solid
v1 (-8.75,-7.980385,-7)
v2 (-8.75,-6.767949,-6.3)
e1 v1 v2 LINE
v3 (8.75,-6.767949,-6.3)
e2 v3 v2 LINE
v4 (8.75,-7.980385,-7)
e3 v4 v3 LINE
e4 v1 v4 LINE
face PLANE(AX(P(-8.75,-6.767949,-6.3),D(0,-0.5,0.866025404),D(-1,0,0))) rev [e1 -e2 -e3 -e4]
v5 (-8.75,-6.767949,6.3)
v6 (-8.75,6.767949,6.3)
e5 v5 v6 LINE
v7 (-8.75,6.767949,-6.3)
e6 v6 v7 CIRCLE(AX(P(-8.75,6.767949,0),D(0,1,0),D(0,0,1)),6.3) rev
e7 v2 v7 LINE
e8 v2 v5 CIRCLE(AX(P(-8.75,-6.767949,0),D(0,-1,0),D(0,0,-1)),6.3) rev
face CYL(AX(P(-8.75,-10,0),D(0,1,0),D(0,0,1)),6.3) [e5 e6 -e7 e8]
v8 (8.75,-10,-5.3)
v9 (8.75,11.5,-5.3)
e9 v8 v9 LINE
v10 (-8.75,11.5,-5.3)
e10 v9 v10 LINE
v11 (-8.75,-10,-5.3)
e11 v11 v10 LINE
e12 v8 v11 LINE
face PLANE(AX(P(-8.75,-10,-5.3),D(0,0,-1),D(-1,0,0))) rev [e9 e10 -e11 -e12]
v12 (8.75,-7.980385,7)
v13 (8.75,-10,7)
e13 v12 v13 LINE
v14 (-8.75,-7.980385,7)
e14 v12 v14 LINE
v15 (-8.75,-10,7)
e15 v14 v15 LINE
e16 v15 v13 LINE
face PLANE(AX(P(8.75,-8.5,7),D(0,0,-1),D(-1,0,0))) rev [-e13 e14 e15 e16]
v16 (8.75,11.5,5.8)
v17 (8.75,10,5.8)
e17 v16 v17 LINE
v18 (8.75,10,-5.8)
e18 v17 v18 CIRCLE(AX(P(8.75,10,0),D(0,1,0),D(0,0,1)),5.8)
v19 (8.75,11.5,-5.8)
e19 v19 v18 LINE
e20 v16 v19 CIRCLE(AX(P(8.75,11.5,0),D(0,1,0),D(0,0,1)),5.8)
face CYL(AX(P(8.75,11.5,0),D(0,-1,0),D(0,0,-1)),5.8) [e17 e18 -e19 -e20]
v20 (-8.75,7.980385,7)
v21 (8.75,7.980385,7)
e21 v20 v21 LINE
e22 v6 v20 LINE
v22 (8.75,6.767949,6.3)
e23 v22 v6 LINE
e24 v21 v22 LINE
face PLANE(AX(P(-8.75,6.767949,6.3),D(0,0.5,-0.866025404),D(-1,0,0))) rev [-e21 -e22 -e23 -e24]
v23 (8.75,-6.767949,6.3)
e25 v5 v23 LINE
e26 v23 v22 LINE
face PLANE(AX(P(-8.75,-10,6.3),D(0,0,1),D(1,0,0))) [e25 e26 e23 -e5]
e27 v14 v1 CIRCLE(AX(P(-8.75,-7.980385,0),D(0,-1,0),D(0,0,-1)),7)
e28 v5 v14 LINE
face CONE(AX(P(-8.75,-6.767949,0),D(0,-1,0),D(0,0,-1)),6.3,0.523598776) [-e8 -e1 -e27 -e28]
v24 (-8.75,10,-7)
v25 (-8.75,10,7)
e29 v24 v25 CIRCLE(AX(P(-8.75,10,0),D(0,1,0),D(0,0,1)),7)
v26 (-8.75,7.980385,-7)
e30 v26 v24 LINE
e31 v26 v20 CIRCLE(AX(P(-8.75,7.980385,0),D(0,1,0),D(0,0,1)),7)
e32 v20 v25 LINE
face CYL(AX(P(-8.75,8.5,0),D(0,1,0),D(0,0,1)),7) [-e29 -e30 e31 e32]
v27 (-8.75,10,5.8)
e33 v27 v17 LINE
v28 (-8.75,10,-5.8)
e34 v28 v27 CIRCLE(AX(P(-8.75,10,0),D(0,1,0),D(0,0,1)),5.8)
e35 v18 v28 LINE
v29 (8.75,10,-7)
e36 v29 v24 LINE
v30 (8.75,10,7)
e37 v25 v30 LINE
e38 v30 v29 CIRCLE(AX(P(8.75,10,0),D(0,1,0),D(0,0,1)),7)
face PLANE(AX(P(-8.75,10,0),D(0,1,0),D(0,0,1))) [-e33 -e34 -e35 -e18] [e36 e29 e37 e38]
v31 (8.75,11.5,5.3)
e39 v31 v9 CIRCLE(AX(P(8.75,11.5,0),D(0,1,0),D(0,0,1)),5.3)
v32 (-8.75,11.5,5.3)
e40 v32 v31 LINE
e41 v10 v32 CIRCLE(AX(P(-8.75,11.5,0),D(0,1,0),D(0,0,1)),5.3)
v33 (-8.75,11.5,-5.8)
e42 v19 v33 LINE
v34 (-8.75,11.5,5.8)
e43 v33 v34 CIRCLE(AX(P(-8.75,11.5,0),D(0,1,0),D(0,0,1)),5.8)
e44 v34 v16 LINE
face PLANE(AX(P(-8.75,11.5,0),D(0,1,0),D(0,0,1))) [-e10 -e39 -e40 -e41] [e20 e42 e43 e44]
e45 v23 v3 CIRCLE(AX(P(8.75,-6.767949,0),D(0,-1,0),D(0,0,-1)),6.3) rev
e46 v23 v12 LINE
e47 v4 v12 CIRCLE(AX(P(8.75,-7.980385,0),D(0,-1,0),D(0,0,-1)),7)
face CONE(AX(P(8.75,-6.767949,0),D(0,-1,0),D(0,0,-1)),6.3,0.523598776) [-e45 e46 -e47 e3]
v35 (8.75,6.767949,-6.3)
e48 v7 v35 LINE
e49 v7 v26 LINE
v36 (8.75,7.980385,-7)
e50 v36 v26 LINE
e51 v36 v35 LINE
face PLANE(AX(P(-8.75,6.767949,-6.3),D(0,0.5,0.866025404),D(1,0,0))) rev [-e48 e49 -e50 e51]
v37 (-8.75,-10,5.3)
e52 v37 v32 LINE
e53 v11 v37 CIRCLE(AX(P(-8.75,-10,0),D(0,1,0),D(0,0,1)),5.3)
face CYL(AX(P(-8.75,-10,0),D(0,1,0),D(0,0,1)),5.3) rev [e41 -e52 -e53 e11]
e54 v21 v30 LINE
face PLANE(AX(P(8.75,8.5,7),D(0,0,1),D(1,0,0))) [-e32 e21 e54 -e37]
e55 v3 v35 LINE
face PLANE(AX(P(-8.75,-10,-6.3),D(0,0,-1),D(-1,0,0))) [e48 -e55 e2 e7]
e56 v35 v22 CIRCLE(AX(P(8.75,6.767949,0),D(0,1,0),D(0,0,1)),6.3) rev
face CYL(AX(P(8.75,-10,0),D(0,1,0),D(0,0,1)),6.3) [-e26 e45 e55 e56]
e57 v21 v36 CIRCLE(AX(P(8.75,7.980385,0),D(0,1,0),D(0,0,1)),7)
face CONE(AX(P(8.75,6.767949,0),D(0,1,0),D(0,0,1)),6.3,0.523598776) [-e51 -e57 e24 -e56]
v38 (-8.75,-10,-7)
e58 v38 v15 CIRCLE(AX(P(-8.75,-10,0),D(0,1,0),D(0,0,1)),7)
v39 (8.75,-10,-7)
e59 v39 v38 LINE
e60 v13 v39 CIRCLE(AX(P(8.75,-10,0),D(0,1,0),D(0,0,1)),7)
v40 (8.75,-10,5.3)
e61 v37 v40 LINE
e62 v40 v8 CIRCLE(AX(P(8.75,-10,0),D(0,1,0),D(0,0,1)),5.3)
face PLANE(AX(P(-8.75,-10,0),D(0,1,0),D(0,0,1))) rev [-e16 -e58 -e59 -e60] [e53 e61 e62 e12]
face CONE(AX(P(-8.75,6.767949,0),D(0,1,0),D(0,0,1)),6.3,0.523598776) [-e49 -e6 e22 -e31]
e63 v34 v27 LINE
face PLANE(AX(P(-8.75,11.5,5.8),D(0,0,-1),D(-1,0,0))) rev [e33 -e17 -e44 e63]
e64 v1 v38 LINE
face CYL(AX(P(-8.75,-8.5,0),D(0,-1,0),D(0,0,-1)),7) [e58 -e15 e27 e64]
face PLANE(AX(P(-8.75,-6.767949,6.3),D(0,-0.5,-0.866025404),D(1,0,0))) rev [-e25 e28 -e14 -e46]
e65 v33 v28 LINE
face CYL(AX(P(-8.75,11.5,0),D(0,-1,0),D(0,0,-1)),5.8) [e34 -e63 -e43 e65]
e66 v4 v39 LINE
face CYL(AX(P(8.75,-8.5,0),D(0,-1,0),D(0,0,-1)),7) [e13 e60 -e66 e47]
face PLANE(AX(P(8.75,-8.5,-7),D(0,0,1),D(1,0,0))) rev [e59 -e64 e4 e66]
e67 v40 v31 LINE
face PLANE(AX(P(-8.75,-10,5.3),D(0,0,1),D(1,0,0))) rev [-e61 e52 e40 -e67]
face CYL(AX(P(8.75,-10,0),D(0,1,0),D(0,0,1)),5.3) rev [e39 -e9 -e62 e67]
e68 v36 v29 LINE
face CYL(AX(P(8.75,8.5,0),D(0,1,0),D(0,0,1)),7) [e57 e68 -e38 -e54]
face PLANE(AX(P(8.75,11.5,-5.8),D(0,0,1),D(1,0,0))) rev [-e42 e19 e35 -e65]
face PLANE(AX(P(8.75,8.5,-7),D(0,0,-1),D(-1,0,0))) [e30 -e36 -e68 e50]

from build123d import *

# Parameters (mm, degrees)
BOSS_EXTRUDE1_DEPTH      = 10
BOSS_EXTRUDE1_DEPTH_BACK = 10
BOSS_EXTRUDE2_START      = -1.5
BOSS_EXTRUDE2_DEPTH      = 1.5
BOSS_EXTRUDE3_DEPTH      = 1.5
CHAMFER1_SIZE            = 1
CHAMFER1_SIZE_2          = 1.732050808


with BuildPart() as part:
    # Sketch1 → Boss-Extrude1 (new, two sides: drawn at the far end of the back side and taken through both)
    with BuildSketch(Plane(origin=(0, 0, 0), x_dir=(1, 0, 0), z_dir=(0, 1, 0)).offset(-BOSS_EXTRUDE1_DEPTH_BACK)):
        with BuildLine():
            Line((-8.75, 6.3), (8.75, 6.3))
            ThreePointArc((8.75, 6.3), (15.05, 0), (8.75, -6.3))
            Line((8.75, -6.3), (-8.75, -6.3))
            ThreePointArc((-8.75, -6.3), (-15.05, 0), (-8.75, 6.3))
        make_face()
        with BuildLine():
            Line((-8.75, 5.3), (8.75, 5.3))
            ThreePointArc((8.75, 5.3), (14.05, 0), (8.75, -5.3))
            Line((8.75, -5.3), (-8.75, -5.3))
            ThreePointArc((-8.75, -5.3), (-14.05, 0), (-8.75, 5.3))
        make_face(mode=Mode.SUBTRACT)
    extrude(amount=BOSS_EXTRUDE1_DEPTH + BOSS_EXTRUDE1_DEPTH_BACK)

    # Sketch2 → Boss-Extrude2 (add)
    with BuildSketch(Plane(origin=(0, 10, 0), x_dir=(1, 0, 0), z_dir=(0, 1, 0)).offset(BOSS_EXTRUDE2_START)):
        with BuildLine():
            Line((8.75, -7), (-8.75, -7))
            ThreePointArc((-8.75, -7), (-15.75, 0), (-8.75, 7))
            Line((-8.75, 7), (8.75, 7))
            ThreePointArc((8.75, 7), (15.75, 0), (8.75, -7))
        make_face()
        with BuildLine():
            Line((-8.75, -5.3), (8.75, -5.3))
            ThreePointArc((8.75, -5.3), (14.05, 0), (8.75, 5.3))
            Line((8.75, 5.3), (-8.75, 5.3))
            ThreePointArc((-8.75, 5.3), (-14.05, 0), (-8.75, -5.3))
        make_face(mode=Mode.SUBTRACT)
    boss_extrude2 = extrude(amount=BOSS_EXTRUDE2_DEPTH)

    # Mirror1: Boss-Extrude2 across plane
    add(boss_extrude2.mirror(Plane.ZX))

    # Sketch3 → Boss-Extrude3 (add)
    with BuildSketch(Plane(origin=(0, 10, 0), x_dir=(1, 0, 0), z_dir=(0, 1, 0))):
        with BuildLine():
            Line((-8.75, -5.8), (8.75, -5.8))
            ThreePointArc((8.75, -5.8), (14.55, 0), (8.75, 5.8))
            Line((8.75, 5.8), (-8.75, 5.8))
            ThreePointArc((-8.75, 5.8), (-14.55, 0), (-8.75, -5.8))
        make_face()
        with BuildLine():
            Line((-8.75, -5.3), (8.75, -5.3))
            ThreePointArc((8.75, -5.3), (14.05, 0), (8.75, 5.3))
            Line((8.75, 5.3), (-8.75, 5.3))
            ThreePointArc((-8.75, 5.3), (-14.05, 0), (-8.75, -5.3))
        make_face(mode=Mode.SUBTRACT)
    extrude(amount=BOSS_EXTRUDE3_DEPTH)

    # Chamfer1
    # the kernel refuses this chamfer: 1.732050808, 1 mm, written as the material it adds along each edge
    with BuildSketch(Plane(origin=(8.75, -8.5, 0), x_dir=(0, 0, -1), z_dir=(-1, 0, 0))) as chamfer1_piece_1_section:
        Polygon((6.3 + CHAMFER1_SIZE, 0), (6.3, -CHAMFER1_SIZE_2), (6.3, 0), align=None)
    chamfer1_piece_1 = revolve(axis=Axis((8.75, -8.5, 0), (0, -1, 0)), revolution_arc=180, mode=Mode.PRIVATE)
    chamfer1_piece_1 = chamfer1_piece_1 & Plane(origin=(8.75, -7.628425911, 0), x_dir=(0, 0, -1), z_dir=(0, 1, 0)) * Cylinder(7, 30, mode=Mode.PRIVATE)
    add(chamfer1_piece_1)
    with BuildSketch(Plane(origin=(8.75, -8.5, -6.3), x_dir=(0, -0.05789386240267147, -0.9983227437537926), z_dir=(-1, 0, 0))) as chamfer1_piece_2_section:
        Polygon((CHAMFER1_SIZE * 0.998322743754, -CHAMFER1_SIZE * 0.0578938624027), (-CHAMFER1_SIZE_2 * 0.0578938623883, -CHAMFER1_SIZE_2 * 0.998322743505), (0, 0), align=None)
    chamfer1_piece_2 = extrude(amount=17.5, mode=Mode.PRIVATE)
    chamfer1_piece_2 = split(chamfer1_piece_2, bisect_by=Plane(origin=(1.34e-07, -7.886810156, -7), z_dir=(0, 0, 1)), keep=Keep.TOP, mode=Mode.PRIVATE)
    add(chamfer1_piece_2)
    with BuildSketch(Plane(origin=(-8.75, -8.5, 6.3), x_dir=(0, -0.05789386240267147, 0.9983227437537926), z_dir=(1, 0, 0))) as chamfer1_piece_3_section:
        Polygon((CHAMFER1_SIZE * 0.998322743754, -CHAMFER1_SIZE * 0.0578938624027), (-CHAMFER1_SIZE_2 * 0.0578938623883, -CHAMFER1_SIZE_2 * 0.998322743505), (0, 0), align=None)
    chamfer1_piece_3 = extrude(amount=17.5, mode=Mode.PRIVATE)
    chamfer1_piece_3 = split(chamfer1_piece_3, bisect_by=Plane(origin=(-1.34e-07, -7.886810156, 7), z_dir=(0, 0, -1)), keep=Keep.TOP, mode=Mode.PRIVATE)
    add(chamfer1_piece_3)
    with BuildSketch(Plane(origin=(-8.75, -8.5, 0), x_dir=(0, 0, 1), z_dir=(1, 0, 0))) as chamfer1_piece_4_section:
        Polygon((6.3 + CHAMFER1_SIZE, 0), (6.3, -CHAMFER1_SIZE_2), (6.3, 0), align=None)
    chamfer1_piece_4 = revolve(axis=Axis((-8.75, -8.5, 0), (0, -1, 0)), revolution_arc=180, mode=Mode.PRIVATE)
    chamfer1_piece_4 = chamfer1_piece_4 & Plane(origin=(-8.75, -7.628425911, 0), x_dir=(0, 0, 1), z_dir=(0, 1, 0)) * Cylinder(7, 30, mode=Mode.PRIVATE)
    add(chamfer1_piece_4)
    with BuildSketch(Plane(origin=(8.75, 8.5, -6.3), x_dir=(0, -0.9998132206222079, 0.01932676561270069), z_dir=(-1, 0, 0))) as chamfer1_piece_5_section:
        Polygon((CHAMFER1_SIZE_2 * 0.999813220373, -CHAMFER1_SIZE_2 * 0.0193267656079), (-CHAMFER1_SIZE * 0.0193267656127, -CHAMFER1_SIZE * 0.999813220622), (0, 0), align=None)
    chamfer1_piece_5 = extrude(amount=17.5, mode=Mode.PRIVATE)
    chamfer1_piece_5 = split(chamfer1_piece_5, bisect_by=Plane(origin=(7.49146337, 7.814472044, -7), z_dir=(0, 0, 1)), keep=Keep.TOP, mode=Mode.PRIVATE)
    add(chamfer1_piece_5)
    with BuildSketch(Plane(origin=(8.75, 8.5, 0), x_dir=(0, 0, -1), z_dir=(-1, 0, 0))) as chamfer1_piece_6_section:
        Polygon((6.3 + CHAMFER1_SIZE, 0), (6.3, CHAMFER1_SIZE_2), (6.3, 0), align=None)
    chamfer1_piece_6 = revolve(axis=Axis((8.75, 8.5, 0), (0, -1, 0)), revolution_arc=180, mode=Mode.PRIVATE)
    chamfer1_piece_6 = chamfer1_piece_6 & Plane(origin=(8.75, 7.628425911, 0), x_dir=(0, 0, -1), z_dir=(0, -1, 0)) * Cylinder(7, 30, mode=Mode.PRIVATE)
    add(chamfer1_piece_6)
    with BuildSketch(Plane(origin=(-8.75, 8.5, 0), x_dir=(0, 0, 1), z_dir=(1, 0, 0))) as chamfer1_piece_7_section:
        Polygon((6.3 + CHAMFER1_SIZE, 0), (6.3, CHAMFER1_SIZE_2), (6.3, 0), align=None)
    chamfer1_piece_7 = revolve(axis=Axis((-8.75, 8.5, 0), (0, -1, 0)), revolution_arc=180, mode=Mode.PRIVATE)
    chamfer1_piece_7 = chamfer1_piece_7 & Plane(origin=(-8.75, 7.628425911, 0), x_dir=(0, 0, 1), z_dir=(0, -1, 0)) * Cylinder(7, 30, mode=Mode.PRIVATE)
    add(chamfer1_piece_7)
    with BuildSketch(Plane(origin=(-8.75, 8.5, 6.3), x_dir=(0, 0.05789386240267147, 0.9983227437537926), z_dir=(1, 0, 0))) as chamfer1_piece_8_section:
        Polygon((CHAMFER1_SIZE * 0.998322743754, CHAMFER1_SIZE * 0.0578938624027), (-CHAMFER1_SIZE_2 * 0.0578938623883, CHAMFER1_SIZE_2 * 0.998322743505), (0, 0), align=None)
    chamfer1_piece_8 = extrude(amount=17.5, mode=Mode.PRIVATE)
    chamfer1_piece_8 = split(chamfer1_piece_8, bisect_by=Plane(origin=(-1.34e-07, 7.886810156, 7), z_dir=(0, 0, -1)), keep=Keep.TOP, mode=Mode.PRIVATE)
    add(chamfer1_piece_8)


solid = part.part
